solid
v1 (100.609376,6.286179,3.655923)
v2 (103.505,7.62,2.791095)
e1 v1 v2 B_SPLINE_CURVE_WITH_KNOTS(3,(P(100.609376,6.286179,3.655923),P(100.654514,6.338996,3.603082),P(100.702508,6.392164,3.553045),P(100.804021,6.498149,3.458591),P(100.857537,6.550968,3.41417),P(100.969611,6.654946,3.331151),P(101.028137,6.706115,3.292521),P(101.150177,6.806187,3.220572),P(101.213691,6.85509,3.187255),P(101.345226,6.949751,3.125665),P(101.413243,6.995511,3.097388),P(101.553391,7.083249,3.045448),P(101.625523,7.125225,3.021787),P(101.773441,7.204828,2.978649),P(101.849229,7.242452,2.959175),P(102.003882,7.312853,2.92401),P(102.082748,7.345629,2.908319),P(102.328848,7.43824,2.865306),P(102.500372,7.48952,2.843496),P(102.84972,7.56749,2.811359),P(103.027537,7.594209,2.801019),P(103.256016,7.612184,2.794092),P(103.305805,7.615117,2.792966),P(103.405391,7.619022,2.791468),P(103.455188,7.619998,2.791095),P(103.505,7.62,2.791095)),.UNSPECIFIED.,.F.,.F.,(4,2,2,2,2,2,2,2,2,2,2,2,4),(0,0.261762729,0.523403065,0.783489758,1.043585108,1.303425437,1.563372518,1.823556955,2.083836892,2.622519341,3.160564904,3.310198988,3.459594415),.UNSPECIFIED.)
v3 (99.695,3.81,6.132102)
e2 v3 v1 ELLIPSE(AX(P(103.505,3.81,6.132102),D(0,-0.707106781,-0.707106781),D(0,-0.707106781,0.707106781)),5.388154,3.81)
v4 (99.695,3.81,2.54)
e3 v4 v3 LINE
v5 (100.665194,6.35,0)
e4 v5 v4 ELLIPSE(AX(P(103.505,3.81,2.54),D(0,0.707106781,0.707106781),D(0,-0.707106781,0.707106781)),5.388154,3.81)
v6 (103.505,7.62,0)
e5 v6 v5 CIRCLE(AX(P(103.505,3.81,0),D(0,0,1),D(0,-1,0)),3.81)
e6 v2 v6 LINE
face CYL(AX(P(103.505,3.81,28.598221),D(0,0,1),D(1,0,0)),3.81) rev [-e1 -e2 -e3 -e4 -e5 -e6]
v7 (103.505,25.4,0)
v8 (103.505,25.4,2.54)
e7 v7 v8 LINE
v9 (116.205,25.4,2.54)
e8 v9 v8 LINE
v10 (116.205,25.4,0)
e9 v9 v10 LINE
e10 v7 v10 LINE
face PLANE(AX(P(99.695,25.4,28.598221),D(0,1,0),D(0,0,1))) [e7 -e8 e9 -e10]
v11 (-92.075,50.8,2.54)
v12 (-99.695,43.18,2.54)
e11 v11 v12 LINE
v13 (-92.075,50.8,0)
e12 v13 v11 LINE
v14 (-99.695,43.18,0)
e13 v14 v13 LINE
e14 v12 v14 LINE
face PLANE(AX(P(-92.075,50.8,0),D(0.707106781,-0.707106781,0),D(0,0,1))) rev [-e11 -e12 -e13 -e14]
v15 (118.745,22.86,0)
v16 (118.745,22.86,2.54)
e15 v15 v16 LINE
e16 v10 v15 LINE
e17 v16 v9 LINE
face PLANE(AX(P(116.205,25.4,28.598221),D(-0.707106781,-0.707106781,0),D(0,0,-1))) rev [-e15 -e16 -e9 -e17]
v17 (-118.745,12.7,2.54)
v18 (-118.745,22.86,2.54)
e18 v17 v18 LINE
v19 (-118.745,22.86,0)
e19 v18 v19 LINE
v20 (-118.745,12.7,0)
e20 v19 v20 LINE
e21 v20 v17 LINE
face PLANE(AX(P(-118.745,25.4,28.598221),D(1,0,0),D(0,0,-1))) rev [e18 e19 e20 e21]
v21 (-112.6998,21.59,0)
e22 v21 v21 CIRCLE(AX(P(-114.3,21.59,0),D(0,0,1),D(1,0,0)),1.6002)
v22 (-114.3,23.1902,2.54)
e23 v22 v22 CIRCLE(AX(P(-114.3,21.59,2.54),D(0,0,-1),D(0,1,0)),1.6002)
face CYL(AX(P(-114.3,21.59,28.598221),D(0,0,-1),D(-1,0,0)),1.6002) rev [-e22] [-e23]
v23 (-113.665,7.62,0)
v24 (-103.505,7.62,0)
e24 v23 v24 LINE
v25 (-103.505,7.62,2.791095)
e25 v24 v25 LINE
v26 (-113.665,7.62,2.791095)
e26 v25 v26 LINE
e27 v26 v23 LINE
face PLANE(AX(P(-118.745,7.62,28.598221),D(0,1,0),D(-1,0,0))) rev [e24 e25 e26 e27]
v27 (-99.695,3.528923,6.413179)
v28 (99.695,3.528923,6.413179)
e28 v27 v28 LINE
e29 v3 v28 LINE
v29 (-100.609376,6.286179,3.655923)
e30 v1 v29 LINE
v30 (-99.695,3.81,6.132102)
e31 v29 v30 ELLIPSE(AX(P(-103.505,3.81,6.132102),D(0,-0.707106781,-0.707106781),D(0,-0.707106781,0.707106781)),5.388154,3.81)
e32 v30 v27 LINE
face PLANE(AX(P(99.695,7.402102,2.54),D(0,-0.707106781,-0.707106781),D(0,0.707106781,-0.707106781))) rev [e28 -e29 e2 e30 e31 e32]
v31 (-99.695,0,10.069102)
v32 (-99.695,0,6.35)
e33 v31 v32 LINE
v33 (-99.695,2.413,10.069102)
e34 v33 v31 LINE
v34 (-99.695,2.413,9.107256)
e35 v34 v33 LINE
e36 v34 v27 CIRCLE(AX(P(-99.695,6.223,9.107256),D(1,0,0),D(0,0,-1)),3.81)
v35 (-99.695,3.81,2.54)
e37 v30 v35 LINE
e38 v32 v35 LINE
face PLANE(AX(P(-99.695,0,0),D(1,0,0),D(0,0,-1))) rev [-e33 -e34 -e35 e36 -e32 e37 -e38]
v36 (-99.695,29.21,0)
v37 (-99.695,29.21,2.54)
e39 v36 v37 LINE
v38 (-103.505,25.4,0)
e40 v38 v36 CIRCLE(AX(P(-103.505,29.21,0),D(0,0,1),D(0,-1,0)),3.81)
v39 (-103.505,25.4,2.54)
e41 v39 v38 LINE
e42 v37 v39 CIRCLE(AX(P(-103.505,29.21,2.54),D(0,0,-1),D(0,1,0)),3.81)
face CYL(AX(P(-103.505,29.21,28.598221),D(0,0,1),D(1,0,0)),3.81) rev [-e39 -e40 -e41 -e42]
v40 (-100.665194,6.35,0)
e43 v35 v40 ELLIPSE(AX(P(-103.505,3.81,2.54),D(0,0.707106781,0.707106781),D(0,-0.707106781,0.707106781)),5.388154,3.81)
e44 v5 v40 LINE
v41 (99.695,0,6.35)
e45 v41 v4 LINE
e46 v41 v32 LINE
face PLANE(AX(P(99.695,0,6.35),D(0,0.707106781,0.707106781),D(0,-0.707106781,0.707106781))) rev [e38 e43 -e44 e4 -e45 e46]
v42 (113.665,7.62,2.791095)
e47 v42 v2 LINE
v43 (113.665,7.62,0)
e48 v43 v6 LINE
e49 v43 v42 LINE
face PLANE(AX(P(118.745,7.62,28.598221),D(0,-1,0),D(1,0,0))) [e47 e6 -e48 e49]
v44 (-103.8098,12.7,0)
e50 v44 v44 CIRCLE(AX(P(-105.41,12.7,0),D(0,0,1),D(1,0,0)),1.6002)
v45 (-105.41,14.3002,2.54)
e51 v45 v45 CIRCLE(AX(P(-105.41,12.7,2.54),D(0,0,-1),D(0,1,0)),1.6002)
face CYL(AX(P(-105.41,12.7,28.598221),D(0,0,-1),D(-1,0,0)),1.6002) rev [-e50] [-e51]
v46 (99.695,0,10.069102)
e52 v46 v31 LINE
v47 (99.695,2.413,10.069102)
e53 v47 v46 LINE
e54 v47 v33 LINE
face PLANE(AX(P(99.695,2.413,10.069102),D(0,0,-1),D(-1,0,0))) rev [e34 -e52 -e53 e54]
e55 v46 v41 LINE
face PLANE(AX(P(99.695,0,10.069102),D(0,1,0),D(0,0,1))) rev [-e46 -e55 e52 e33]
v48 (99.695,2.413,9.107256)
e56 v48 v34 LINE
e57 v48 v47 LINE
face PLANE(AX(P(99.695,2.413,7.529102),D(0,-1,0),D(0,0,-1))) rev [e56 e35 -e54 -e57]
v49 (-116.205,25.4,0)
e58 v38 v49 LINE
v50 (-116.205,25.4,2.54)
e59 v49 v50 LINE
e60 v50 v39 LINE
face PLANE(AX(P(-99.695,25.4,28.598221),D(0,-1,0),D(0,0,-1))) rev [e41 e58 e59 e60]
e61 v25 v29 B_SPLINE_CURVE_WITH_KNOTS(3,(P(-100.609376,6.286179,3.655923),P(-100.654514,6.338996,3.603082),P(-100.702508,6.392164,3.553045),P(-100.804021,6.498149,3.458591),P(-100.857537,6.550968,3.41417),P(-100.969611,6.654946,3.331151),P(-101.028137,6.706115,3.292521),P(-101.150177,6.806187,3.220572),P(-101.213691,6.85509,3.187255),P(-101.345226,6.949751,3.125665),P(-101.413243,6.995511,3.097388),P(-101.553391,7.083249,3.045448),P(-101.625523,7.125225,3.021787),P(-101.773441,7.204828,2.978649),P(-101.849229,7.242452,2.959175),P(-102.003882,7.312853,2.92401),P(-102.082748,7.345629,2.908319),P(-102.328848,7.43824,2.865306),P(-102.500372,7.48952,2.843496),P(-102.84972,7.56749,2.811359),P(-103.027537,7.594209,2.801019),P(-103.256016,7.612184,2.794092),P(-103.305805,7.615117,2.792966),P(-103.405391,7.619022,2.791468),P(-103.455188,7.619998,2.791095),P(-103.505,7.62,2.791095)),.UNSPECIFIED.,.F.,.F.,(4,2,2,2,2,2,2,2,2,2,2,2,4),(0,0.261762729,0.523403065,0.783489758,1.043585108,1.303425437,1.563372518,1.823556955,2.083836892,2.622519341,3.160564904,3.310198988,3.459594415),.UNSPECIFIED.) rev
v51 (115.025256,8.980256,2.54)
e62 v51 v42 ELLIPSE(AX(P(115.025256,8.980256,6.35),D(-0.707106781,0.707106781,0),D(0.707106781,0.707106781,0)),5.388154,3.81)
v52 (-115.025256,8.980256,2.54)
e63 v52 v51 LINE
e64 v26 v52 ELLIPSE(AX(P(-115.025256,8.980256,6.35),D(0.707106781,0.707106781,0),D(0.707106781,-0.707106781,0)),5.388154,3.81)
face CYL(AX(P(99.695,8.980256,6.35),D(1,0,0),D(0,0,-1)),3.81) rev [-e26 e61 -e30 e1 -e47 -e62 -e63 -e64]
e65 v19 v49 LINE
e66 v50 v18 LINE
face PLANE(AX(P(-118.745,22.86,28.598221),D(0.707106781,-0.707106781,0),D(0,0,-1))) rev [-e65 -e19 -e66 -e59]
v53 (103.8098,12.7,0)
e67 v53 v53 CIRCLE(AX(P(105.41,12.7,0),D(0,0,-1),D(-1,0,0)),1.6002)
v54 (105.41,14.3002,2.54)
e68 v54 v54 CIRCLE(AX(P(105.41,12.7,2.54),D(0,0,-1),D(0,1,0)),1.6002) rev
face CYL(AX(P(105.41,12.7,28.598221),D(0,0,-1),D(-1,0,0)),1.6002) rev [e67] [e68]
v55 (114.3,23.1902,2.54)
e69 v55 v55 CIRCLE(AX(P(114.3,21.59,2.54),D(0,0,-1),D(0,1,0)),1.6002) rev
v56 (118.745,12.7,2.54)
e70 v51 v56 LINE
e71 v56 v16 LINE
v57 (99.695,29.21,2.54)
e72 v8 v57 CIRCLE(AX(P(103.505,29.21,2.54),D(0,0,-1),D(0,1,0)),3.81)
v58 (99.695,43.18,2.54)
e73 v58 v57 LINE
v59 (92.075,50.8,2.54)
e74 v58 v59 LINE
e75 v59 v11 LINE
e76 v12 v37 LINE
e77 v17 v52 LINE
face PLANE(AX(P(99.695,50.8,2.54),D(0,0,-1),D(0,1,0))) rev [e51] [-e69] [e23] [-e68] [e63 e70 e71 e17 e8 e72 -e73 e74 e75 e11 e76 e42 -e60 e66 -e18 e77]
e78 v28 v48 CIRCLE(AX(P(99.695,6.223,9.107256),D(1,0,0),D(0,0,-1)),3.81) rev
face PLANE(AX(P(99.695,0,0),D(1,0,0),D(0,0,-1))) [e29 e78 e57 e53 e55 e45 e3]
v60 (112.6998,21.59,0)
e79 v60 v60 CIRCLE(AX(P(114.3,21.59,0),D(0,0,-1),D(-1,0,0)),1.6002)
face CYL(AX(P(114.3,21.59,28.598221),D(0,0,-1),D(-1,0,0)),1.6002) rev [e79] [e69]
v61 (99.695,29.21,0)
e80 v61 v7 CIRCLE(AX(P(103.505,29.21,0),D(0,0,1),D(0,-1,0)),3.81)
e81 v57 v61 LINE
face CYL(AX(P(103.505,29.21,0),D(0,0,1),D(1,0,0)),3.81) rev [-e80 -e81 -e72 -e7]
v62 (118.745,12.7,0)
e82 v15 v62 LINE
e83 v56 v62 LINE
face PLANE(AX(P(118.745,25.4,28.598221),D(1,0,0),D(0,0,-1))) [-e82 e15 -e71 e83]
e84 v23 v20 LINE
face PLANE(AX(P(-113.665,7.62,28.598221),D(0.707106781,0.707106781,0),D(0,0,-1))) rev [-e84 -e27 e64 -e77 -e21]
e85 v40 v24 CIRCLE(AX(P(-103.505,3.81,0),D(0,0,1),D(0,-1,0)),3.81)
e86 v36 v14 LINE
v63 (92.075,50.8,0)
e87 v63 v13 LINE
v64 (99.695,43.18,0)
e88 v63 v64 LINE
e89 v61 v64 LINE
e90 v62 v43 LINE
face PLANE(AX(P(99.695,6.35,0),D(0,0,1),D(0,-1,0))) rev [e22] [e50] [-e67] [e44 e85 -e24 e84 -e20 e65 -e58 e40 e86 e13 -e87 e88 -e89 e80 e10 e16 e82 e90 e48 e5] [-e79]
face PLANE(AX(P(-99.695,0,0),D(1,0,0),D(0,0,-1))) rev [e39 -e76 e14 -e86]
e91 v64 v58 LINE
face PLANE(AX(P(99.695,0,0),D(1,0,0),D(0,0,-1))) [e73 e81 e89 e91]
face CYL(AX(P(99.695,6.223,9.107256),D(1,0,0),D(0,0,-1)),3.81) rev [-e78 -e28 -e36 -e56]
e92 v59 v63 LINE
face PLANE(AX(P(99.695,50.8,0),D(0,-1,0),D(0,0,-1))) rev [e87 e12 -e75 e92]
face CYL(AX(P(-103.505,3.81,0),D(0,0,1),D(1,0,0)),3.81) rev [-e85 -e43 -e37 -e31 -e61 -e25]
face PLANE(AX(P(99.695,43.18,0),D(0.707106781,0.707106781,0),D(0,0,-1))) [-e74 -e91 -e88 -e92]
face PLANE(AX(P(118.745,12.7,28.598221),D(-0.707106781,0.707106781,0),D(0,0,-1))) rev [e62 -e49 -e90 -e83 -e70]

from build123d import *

# Parameters (mm, degrees)
BOSS_EXTRUDE1_DEPTH  = 99.695
SKETCH3_W            = 19.05
SKETCH3_H            = 17.78
SKETCH3_R            = 1.6002
MOUNTING_PLATE_DEPTH = 2.54
CHAMFER1_SIZE        = 5.08
CHAMFER2_SIZE        = 2.54
CHAMFER3_SIZE        = 7.62
FILLET1_R            = 3.81


with BuildPart() as part:
    # Sketch2 → Boss-Extrude1 (new, symmetric)
    with BuildSketch(Plane(origin=(0, 0, 0), x_dir=(0, 0, -1), z_dir=(1, 0, 0))):
        Polygon((-10.069102448, 0), (-6.35, 0), (0, 6.35), (0, 50.8), (-2.54, 50.8), (-2.54, 7.402102448), (-7.529102448, 2.413), (-10.069102448, 2.413), align=None)
    extrude(amount=BOSS_EXTRUDE1_DEPTH, both=True)

    # Sketch3 → Mounting-Plate (add)
    with BuildSketch(Plane.XY):
        with Locations((-109.22, 16.51)):
            Rectangle(SKETCH3_W, SKETCH3_H)
        with Locations(Location((-114.3, 21.59, 0), (0, 0, 90))):
            Circle(SKETCH3_R, mode=Mode.SUBTRACT)
        with Locations(Location((-105.41, 12.7, 0), (0, 0, 90))):
            Circle(SKETCH3_R, mode=Mode.SUBTRACT)
    mounting_plate = extrude(amount=MOUNTING_PLATE_DEPTH)

    # Mirror1: Mounting-Plate across plane
    add(mounting_plate.mirror(Plane(origin=(0, 0, 0), x_dir=(0, 0, 1), z_dir=(1, 0, 0))))

    # Chamfer1
    chamfer1_edges = [part.edges().sort_by_distance(p)[0] for p in [
        (-118.745, 7.62, 1.27),
        (118.745, 7.62, 1.27),
    ]]
    chamfer(chamfer1_edges, length=CHAMFER1_SIZE)

    # Chamfer2
    chamfer2_edges = [part.edges().sort_by_distance(p)[0] for p in [
        (-118.745, 25.4, 1.27),
        (118.745, 25.4, 1.27),
    ]]
    chamfer(chamfer2_edges, length=CHAMFER2_SIZE)

    # Chamfer3
    chamfer3_edges = [part.edges().sort_by_distance(p)[0] for p in [
        (99.695, 50.8, 1.27),
        (-99.695, 50.8, 1.27),
    ]]
    chamfer(chamfer3_edges, length=CHAMFER3_SIZE)

    # Fillet1
    fillet1_edges = [part.edges().sort_by_distance(p)[0] for p in [
        (0, 7.402102448, 2.54),
    ]]
    fillet(fillet1_edges, radius=FILLET1_R)
    fillet1_2_edges = [part.edges().sort_by_distance(p)[0] for p in [
        (-99.695, 25.4, 1.27),
    ]]
    fillet(fillet1_2_edges, radius=FILLET1_R)
    fillet1_3_edges = [part.edges().sort_by_distance(p)[0] for p in [
        (99.695, 25.4, 1.27),
    ]]
    fillet(fillet1_3_edges, radius=FILLET1_R)
    fillet1_4_edges = [part.edges().sort_by_distance(p)[0] for p in [
        (-99.695, 7.62, 1.395547606),
    ]]
    fillet(fillet1_4_edges, radius=FILLET1_R)
    fillet1_5_edges = [part.edges().sort_by_distance(p)[0] for p in [
        (0, 2.413, 7.529102448),
    ]]
    fillet(fillet1_5_edges, radius=FILLET1_R)
    fillet1_6_edges = [part.edges().sort_by_distance(p)[0] for p in [
        (99.695, 7.62, 1.395547606),
    ]]
    fillet(fillet1_6_edges, radius=FILLET1_R)


solid = part.part
